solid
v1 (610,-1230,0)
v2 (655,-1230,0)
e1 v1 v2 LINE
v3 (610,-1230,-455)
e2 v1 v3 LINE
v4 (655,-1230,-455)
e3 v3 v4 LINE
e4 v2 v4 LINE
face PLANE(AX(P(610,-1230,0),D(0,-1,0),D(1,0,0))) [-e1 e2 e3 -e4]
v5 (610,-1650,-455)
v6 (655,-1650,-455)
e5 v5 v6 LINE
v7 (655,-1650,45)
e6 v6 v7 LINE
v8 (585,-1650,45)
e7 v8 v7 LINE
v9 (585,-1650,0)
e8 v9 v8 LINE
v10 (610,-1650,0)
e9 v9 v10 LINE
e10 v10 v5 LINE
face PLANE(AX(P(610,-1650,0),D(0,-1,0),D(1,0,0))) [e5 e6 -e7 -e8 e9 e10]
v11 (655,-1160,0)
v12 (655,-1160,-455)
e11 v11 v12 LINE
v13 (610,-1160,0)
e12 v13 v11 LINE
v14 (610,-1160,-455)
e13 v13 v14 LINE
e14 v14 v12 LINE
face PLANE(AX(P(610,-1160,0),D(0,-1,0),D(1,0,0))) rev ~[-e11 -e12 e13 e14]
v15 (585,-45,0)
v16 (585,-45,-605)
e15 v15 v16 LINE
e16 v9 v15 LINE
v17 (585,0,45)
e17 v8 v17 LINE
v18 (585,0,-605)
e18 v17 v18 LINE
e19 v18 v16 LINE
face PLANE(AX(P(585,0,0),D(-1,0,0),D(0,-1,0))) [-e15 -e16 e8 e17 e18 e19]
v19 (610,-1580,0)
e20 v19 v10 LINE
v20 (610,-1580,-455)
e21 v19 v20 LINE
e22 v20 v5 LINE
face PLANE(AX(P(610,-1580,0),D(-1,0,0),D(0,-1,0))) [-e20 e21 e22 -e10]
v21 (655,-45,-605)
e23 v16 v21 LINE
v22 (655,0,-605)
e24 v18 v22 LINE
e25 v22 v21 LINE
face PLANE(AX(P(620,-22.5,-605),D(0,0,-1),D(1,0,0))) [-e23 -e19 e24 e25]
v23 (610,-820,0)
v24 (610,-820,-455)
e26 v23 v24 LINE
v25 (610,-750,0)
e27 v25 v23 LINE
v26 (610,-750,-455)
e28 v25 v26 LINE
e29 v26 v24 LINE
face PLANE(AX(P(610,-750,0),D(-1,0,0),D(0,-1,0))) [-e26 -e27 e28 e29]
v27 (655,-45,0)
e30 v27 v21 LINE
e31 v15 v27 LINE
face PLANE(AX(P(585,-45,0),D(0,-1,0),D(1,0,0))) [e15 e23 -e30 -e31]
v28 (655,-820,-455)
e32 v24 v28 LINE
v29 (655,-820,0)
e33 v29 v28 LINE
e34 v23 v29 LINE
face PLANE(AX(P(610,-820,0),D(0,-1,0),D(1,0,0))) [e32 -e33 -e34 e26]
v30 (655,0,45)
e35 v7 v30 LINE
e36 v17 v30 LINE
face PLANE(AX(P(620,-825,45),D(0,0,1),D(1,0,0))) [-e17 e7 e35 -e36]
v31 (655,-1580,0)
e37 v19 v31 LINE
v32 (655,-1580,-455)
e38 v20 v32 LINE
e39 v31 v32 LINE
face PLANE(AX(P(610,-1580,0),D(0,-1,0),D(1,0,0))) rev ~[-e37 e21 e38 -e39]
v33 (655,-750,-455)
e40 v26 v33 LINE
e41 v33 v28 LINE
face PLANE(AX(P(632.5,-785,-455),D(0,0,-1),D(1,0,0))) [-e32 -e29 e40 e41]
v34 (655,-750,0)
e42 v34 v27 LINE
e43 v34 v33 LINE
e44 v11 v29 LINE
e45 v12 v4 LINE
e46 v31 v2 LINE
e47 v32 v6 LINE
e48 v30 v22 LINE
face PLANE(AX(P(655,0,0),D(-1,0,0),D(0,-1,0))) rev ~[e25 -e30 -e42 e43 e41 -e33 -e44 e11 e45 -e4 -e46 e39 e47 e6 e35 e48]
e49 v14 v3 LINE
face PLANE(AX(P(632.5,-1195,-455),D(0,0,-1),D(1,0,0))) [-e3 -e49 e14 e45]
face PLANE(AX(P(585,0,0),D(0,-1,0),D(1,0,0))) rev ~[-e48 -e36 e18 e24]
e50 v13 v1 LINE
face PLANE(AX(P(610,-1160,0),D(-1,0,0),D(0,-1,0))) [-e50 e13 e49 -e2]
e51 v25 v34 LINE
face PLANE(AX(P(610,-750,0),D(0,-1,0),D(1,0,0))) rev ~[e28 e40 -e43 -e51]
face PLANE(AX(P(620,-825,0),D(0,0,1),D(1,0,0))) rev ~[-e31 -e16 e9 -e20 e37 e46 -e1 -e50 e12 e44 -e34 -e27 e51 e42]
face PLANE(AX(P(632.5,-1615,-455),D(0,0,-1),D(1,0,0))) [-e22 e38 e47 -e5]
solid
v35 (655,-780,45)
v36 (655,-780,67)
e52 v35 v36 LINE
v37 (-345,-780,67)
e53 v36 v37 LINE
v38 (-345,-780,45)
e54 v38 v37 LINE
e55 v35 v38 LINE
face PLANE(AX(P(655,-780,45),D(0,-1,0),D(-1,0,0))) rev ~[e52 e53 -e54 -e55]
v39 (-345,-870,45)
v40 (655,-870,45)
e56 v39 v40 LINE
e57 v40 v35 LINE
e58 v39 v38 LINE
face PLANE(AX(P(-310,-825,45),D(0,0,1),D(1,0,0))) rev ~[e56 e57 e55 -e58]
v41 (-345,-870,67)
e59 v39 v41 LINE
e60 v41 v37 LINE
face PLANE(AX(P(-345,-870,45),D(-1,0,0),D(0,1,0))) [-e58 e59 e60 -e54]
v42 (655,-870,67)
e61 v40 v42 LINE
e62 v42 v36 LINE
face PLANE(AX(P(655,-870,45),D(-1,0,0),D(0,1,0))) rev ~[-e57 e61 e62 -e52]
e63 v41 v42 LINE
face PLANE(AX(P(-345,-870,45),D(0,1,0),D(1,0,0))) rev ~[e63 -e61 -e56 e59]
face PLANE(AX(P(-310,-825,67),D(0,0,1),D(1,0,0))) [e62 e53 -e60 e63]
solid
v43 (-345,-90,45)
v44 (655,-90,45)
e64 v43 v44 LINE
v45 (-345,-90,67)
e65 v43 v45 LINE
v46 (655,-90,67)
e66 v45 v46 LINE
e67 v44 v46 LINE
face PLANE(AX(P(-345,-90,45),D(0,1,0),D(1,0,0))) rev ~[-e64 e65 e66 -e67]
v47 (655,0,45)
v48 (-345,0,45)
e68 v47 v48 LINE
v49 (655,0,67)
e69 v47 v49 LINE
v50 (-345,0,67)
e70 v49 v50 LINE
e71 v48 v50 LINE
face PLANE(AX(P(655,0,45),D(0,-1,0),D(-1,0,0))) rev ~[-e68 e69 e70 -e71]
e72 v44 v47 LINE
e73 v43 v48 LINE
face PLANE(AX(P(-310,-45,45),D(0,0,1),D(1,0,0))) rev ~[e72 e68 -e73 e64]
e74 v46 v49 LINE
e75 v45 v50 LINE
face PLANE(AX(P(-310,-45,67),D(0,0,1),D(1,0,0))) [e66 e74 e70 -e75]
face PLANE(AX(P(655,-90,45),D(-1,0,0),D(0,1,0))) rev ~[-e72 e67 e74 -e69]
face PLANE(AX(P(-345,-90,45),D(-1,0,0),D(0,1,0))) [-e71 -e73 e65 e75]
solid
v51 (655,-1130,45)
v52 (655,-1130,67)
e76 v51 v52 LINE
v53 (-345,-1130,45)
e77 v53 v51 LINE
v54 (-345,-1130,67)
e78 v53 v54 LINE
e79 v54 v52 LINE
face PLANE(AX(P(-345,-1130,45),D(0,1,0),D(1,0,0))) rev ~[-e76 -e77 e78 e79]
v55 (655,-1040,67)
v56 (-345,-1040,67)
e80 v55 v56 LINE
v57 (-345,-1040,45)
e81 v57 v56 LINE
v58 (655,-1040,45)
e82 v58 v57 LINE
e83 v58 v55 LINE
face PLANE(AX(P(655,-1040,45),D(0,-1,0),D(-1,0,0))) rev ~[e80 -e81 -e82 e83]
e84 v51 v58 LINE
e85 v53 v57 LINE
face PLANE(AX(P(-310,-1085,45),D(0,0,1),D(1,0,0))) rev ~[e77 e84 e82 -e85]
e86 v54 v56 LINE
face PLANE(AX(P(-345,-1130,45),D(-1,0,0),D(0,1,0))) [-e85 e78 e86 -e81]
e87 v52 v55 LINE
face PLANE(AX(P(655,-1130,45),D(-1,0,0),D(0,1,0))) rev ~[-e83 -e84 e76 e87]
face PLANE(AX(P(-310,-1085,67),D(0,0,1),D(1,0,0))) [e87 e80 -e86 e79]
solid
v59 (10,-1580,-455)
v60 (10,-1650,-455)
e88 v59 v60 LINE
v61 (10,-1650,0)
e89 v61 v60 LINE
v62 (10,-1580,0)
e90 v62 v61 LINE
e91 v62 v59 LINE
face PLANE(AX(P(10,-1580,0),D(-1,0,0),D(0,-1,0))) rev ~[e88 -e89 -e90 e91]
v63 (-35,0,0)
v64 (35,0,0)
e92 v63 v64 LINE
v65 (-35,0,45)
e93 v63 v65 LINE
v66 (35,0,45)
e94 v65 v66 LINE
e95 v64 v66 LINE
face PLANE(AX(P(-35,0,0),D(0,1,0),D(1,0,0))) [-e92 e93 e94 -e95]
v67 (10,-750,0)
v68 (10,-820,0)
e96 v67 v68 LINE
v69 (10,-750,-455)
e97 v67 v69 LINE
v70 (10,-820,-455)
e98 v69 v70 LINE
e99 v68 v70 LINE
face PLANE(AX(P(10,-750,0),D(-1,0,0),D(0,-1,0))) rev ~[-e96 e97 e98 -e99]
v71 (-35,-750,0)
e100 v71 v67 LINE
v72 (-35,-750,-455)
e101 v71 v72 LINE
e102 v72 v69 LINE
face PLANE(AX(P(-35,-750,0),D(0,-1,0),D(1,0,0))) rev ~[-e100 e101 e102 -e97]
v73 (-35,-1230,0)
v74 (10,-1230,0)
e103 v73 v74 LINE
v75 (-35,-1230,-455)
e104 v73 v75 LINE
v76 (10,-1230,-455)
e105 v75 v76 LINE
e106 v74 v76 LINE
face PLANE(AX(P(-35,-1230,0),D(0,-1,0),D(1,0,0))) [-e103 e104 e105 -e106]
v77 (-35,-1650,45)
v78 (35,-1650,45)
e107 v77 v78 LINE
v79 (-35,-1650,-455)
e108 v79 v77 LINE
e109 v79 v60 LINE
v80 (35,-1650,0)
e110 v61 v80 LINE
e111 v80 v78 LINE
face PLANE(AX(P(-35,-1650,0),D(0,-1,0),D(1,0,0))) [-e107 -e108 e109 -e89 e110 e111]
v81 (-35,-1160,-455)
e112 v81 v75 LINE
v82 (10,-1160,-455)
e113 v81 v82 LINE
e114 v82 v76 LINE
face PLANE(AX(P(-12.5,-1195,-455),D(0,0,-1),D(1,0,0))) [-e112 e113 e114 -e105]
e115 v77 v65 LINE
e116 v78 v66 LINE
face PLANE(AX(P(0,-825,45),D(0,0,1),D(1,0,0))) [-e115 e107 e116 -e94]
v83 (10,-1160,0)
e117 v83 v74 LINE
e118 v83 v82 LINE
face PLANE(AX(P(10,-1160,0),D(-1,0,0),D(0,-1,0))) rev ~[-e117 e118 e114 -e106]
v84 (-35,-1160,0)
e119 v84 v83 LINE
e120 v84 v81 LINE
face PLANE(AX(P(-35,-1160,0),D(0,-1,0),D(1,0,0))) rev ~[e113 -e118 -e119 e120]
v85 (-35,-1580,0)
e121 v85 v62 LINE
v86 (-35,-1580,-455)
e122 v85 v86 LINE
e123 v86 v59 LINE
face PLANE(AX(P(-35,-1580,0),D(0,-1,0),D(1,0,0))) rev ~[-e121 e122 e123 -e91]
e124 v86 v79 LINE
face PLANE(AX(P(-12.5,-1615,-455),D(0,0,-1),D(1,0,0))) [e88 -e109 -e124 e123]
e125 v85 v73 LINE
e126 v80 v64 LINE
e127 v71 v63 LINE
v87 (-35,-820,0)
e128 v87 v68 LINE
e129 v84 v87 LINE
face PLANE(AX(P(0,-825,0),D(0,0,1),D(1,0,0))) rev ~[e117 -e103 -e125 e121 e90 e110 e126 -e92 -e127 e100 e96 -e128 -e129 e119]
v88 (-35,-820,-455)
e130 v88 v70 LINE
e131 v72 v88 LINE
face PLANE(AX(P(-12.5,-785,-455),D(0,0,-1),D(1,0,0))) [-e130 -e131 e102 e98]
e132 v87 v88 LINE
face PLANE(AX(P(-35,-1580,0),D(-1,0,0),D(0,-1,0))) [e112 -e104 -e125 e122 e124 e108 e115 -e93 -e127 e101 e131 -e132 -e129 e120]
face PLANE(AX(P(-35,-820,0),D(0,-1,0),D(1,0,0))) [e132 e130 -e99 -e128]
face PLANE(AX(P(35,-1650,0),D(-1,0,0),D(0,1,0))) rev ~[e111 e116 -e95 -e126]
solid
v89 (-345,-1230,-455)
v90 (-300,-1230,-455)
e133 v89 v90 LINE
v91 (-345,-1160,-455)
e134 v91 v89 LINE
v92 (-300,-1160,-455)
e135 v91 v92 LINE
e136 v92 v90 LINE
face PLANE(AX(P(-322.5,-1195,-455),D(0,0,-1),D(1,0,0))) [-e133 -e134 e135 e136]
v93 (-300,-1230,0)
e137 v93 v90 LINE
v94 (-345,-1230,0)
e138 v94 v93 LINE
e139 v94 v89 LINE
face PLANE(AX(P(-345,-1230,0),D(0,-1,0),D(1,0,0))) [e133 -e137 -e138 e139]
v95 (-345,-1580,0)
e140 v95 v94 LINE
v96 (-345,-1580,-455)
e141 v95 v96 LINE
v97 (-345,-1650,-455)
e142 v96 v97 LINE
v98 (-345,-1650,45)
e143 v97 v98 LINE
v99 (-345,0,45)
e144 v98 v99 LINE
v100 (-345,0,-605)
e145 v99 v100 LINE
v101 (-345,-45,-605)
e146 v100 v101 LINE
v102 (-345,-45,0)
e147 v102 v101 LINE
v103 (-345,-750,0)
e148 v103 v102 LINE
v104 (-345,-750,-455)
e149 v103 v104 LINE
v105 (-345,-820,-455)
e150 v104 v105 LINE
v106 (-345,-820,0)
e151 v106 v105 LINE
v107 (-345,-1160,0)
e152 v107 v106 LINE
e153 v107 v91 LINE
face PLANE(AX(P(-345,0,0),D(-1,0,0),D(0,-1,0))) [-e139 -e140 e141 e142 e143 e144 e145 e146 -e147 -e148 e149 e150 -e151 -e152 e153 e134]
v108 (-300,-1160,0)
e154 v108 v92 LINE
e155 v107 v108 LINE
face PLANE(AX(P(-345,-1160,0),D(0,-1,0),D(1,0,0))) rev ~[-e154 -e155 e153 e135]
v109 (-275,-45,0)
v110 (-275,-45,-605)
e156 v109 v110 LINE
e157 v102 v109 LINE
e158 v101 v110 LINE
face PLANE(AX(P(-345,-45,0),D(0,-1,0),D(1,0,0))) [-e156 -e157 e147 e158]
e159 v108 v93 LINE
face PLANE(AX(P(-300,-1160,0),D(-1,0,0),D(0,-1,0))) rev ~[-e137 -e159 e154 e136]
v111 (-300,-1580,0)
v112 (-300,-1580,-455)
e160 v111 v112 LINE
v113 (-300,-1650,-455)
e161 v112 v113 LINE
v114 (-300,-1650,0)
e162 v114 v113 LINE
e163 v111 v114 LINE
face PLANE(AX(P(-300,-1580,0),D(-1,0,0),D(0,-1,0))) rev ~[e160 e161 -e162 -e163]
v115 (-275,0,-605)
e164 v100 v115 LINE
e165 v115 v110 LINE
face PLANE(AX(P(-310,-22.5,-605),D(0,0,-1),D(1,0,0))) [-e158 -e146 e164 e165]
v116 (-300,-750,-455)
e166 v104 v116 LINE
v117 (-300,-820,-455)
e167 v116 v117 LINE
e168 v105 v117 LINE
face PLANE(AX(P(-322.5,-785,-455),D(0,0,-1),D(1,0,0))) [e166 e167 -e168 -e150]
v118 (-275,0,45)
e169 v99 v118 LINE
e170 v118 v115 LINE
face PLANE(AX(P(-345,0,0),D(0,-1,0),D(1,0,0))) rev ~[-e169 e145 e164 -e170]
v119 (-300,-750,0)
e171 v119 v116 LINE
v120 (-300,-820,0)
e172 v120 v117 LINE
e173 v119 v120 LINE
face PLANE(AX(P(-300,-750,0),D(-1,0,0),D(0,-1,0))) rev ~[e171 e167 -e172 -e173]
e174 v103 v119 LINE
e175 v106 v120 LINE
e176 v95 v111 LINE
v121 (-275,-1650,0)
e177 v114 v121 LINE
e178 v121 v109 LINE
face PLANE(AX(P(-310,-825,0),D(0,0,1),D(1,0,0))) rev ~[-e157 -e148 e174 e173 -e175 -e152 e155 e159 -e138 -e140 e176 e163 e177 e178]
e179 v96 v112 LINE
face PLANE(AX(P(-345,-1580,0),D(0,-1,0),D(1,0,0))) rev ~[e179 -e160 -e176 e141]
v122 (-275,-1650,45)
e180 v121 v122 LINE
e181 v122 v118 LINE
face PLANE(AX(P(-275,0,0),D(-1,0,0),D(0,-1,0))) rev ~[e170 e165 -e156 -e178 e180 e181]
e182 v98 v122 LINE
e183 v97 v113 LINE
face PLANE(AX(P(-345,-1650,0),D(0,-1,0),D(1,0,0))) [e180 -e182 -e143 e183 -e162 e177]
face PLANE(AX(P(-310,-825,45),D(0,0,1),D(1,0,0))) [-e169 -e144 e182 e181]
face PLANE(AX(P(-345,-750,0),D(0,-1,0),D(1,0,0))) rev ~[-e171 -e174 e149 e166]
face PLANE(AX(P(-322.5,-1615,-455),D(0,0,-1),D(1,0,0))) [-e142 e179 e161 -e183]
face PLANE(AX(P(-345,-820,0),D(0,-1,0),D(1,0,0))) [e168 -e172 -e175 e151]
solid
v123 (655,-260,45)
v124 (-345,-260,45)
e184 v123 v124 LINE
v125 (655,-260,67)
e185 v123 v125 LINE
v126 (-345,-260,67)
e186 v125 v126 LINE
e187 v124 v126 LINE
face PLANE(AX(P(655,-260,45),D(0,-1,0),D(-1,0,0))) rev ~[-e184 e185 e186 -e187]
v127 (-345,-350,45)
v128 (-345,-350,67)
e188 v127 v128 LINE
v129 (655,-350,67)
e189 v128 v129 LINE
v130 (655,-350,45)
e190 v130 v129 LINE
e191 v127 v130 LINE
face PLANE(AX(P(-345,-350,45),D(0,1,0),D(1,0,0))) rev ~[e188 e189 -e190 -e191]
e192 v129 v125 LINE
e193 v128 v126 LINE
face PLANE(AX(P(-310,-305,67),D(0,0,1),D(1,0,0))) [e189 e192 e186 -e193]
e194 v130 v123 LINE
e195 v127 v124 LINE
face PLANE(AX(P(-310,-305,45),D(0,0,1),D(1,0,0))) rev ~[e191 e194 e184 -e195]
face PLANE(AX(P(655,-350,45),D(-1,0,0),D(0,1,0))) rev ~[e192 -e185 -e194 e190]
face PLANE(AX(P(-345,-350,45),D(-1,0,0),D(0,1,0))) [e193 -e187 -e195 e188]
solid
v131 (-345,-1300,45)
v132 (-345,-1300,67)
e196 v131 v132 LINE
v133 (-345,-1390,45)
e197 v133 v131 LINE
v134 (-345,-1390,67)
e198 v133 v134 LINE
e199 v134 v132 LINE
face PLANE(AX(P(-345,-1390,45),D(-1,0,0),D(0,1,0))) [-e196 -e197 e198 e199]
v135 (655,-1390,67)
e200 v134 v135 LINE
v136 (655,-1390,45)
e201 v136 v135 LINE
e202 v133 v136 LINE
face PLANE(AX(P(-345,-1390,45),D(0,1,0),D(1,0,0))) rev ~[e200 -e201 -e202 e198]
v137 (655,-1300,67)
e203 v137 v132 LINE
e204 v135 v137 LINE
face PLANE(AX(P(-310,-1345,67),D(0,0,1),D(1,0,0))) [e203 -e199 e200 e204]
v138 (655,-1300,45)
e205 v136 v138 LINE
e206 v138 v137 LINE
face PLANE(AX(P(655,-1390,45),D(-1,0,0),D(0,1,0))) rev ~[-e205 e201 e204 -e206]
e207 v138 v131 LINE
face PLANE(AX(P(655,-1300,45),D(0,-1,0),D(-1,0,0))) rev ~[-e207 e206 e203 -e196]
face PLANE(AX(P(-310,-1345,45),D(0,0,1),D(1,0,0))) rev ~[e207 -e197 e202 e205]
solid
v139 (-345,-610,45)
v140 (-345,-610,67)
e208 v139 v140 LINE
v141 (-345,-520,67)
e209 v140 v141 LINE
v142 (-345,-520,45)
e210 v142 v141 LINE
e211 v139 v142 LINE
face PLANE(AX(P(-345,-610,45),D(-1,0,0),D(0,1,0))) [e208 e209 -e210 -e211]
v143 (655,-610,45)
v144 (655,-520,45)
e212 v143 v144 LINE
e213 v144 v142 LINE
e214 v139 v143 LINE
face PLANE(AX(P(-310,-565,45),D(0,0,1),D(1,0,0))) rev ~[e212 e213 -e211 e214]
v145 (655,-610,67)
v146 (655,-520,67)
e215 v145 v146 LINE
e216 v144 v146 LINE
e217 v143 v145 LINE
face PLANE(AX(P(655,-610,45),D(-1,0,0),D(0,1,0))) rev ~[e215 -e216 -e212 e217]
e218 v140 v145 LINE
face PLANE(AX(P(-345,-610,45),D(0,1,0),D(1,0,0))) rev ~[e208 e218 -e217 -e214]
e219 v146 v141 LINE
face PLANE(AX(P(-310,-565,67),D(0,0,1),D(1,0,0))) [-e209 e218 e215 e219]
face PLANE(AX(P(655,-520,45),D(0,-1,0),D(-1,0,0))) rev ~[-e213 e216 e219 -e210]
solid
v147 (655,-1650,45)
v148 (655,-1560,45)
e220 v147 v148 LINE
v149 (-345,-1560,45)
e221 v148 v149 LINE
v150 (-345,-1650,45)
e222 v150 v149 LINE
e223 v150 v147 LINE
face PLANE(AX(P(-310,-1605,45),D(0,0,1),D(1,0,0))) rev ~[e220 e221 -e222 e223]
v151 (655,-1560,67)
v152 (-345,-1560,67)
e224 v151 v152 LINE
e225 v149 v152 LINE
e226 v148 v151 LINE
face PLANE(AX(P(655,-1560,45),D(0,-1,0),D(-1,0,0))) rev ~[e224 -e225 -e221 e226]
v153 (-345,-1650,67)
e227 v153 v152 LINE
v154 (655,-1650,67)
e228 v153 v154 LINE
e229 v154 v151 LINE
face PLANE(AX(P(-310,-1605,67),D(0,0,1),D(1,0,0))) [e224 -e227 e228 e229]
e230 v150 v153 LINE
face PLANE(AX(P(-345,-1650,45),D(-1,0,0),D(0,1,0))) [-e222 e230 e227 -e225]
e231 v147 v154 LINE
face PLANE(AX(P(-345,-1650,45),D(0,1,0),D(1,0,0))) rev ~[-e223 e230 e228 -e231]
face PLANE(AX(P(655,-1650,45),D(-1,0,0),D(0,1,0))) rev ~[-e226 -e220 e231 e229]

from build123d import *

# Parameters (mm, degrees)
F0_W     = 70
F0_H     = 1650
F1_DEPTH = 45
F2_W     = 45
F2_H     = 70
F3_DEPTH = 455
F2_W_2   = 70
F2_H_2   = 45
F4_DEPTH = 605
F5_W     = 70
F5_H     = 90
F5_W_2   = 930
F6_DEPTH = 22


# Not quite as in the source:
# - a feature names something its author has since deleted; it is built from what else it names


with BuildPart() as f1:
    # F0 (on Top) → F1 (new body)
    with BuildSketch(Plane.XY):
        with Locations((0, -825)):
            Rectangle(F0_W, F0_H)
    extrude(amount=F1_DEPTH)

    # F2 (on face) → F3, piece 2 (join)
    with BuildSketch(Plane(origin=(0, 0, 0), x_dir=(1, 0, 0), z_dir=(0, 0, -1))):
        with Locations((-12.5, 785)):
            Rectangle(F2_W, F2_H)
        with Locations((-12.5, 1615)):
            Rectangle(F2_W, F2_H)
        with Locations((-12.5, 1195)):
            Rectangle(F2_W, F2_H)
    extrude(amount=F3_DEPTH)


with BuildPart() as f1b:
    # F0 (on Top) → F1, piece 2 (new body)
    with BuildSketch(Plane.XY):
        with Locations((620, -825)):
            Rectangle(F0_W, F0_H)
    extrude(amount=F1_DEPTH)

    # F2 (on face) → F3, piece 3 (join)
    with BuildSketch(Plane(origin=(0, 0, 0), x_dir=(1, 0, 0), z_dir=(0, 0, -1))):
        with Locations((632.5, 1615)):
            Rectangle(F2_W, F2_H)
        with Locations((632.5, 785)):
            Rectangle(F2_W, F2_H)
        with Locations((632.5, 1195)):
            Rectangle(F2_W, F2_H)
    extrude(amount=F3_DEPTH)

    # F2 (on face) → F4 (join)
    with BuildSketch(Plane(origin=(0, 0, 0), x_dir=(1, 0, 0), z_dir=(0, 0, -1))):
        with Locations((620, 22.5)):
            Rectangle(F2_W_2, F2_H_2)
    extrude(amount=F4_DEPTH)


with BuildPart() as f1c:
    # F0 (on Top) → F1, piece 3 (new body)
    with BuildSketch(Plane.XY):
        with Locations((-310, -825)):
            Rectangle(F0_W, F0_H)
    extrude(amount=F1_DEPTH)

    # F2 (on face) → F3 (join)
    with BuildSketch(Plane(origin=(0, 0, 0), x_dir=(1, 0, 0), z_dir=(0, 0, -1))):
        with Locations((-322.5, 785)):
            Rectangle(F2_W, F2_H)
        with Locations((-322.5, 1615)):
            Rectangle(F2_W, F2_H)
        with Locations((-322.5, 1195)):
            Rectangle(F2_W, F2_H)
    extrude(amount=F3_DEPTH)

    # F2 (on face) → F4, piece 2 (join)
    with BuildSketch(Plane(origin=(0, 0, 0), x_dir=(1, 0, 0), z_dir=(0, 0, -1))):
        with Locations((-310, 22.5)):
            Rectangle(F2_W_2, F2_H_2)
    extrude(amount=F4_DEPTH)


with BuildPart() as f6:
    # F5 (on face) → F6 (new body)
    with BuildSketch(Plane.XY.offset(45)):
        with Locations((-310, -1605)):
            Rectangle(F5_W, F5_H)
        with Locations((190, -1605)):
            Rectangle(F5_W_2, F5_H)
    extrude(amount=F6_DEPTH)


with BuildPart() as f6b:
    # F5 (on face) → F6, piece 2 (new body)
    with BuildSketch(Plane.XY.offset(45)):
        with Locations((-310, -1345)):
            Rectangle(F5_W, F5_H)
        with Locations((190, -1345)):
            Rectangle(F5_W_2, F5_H)
    extrude(amount=F6_DEPTH)


with BuildPart() as f6c:
    # F5 (on face) → F6, piece 3 (new body)
    with BuildSketch(Plane.XY.offset(45)):
        with Locations((-310, -1085)):
            Rectangle(F5_W, F5_H)
        with Locations((190, -1085)):
            Rectangle(F5_W_2, F5_H)
    extrude(amount=F6_DEPTH)


with BuildPart() as f6d:
    # F5 (on face) → F6, piece 4 (new body)
    with BuildSketch(Plane.XY.offset(45)):
        with Locations((-310, -825)):
            Rectangle(F5_W, F5_H)
        with Locations((190, -825)):
            Rectangle(F5_W_2, F5_H)
    extrude(amount=F6_DEPTH)


with BuildPart() as f6e:
    # F5 (on face) → F6, piece 5 (new body)
    with BuildSketch(Plane.XY.offset(45)):
        with Locations((-310, -565)):
            Rectangle(F5_W, F5_H)
        with Locations((190, -565)):
            Rectangle(F5_W_2, F5_H)
    extrude(amount=F6_DEPTH)


with BuildPart() as f6f:
    # F5 (on face) → F6, piece 6 (new body)
    with BuildSketch(Plane.XY.offset(45)):
        with Locations((-310, -305)):
            Rectangle(F5_W, F5_H)
        with Locations((190, -305)):
            Rectangle(F5_W_2, F5_H)
    extrude(amount=F6_DEPTH)


with BuildPart() as f6g:
    # F5 (on face) → F6, piece 7 (new body)
    with BuildSketch(Plane.XY.offset(45)):
        with Locations((-310, -45)):
            Rectangle(F5_W, F5_H)
        with Locations((190, -45)):
            Rectangle(F5_W_2, F5_H)
    extrude(amount=F6_DEPTH)


solid = Compound([f1.part, f1b.part, f1c.part, f6.part, f6b.part, f6c.part, f6d.part, f6e.part, f6f.part, f6g.part])
